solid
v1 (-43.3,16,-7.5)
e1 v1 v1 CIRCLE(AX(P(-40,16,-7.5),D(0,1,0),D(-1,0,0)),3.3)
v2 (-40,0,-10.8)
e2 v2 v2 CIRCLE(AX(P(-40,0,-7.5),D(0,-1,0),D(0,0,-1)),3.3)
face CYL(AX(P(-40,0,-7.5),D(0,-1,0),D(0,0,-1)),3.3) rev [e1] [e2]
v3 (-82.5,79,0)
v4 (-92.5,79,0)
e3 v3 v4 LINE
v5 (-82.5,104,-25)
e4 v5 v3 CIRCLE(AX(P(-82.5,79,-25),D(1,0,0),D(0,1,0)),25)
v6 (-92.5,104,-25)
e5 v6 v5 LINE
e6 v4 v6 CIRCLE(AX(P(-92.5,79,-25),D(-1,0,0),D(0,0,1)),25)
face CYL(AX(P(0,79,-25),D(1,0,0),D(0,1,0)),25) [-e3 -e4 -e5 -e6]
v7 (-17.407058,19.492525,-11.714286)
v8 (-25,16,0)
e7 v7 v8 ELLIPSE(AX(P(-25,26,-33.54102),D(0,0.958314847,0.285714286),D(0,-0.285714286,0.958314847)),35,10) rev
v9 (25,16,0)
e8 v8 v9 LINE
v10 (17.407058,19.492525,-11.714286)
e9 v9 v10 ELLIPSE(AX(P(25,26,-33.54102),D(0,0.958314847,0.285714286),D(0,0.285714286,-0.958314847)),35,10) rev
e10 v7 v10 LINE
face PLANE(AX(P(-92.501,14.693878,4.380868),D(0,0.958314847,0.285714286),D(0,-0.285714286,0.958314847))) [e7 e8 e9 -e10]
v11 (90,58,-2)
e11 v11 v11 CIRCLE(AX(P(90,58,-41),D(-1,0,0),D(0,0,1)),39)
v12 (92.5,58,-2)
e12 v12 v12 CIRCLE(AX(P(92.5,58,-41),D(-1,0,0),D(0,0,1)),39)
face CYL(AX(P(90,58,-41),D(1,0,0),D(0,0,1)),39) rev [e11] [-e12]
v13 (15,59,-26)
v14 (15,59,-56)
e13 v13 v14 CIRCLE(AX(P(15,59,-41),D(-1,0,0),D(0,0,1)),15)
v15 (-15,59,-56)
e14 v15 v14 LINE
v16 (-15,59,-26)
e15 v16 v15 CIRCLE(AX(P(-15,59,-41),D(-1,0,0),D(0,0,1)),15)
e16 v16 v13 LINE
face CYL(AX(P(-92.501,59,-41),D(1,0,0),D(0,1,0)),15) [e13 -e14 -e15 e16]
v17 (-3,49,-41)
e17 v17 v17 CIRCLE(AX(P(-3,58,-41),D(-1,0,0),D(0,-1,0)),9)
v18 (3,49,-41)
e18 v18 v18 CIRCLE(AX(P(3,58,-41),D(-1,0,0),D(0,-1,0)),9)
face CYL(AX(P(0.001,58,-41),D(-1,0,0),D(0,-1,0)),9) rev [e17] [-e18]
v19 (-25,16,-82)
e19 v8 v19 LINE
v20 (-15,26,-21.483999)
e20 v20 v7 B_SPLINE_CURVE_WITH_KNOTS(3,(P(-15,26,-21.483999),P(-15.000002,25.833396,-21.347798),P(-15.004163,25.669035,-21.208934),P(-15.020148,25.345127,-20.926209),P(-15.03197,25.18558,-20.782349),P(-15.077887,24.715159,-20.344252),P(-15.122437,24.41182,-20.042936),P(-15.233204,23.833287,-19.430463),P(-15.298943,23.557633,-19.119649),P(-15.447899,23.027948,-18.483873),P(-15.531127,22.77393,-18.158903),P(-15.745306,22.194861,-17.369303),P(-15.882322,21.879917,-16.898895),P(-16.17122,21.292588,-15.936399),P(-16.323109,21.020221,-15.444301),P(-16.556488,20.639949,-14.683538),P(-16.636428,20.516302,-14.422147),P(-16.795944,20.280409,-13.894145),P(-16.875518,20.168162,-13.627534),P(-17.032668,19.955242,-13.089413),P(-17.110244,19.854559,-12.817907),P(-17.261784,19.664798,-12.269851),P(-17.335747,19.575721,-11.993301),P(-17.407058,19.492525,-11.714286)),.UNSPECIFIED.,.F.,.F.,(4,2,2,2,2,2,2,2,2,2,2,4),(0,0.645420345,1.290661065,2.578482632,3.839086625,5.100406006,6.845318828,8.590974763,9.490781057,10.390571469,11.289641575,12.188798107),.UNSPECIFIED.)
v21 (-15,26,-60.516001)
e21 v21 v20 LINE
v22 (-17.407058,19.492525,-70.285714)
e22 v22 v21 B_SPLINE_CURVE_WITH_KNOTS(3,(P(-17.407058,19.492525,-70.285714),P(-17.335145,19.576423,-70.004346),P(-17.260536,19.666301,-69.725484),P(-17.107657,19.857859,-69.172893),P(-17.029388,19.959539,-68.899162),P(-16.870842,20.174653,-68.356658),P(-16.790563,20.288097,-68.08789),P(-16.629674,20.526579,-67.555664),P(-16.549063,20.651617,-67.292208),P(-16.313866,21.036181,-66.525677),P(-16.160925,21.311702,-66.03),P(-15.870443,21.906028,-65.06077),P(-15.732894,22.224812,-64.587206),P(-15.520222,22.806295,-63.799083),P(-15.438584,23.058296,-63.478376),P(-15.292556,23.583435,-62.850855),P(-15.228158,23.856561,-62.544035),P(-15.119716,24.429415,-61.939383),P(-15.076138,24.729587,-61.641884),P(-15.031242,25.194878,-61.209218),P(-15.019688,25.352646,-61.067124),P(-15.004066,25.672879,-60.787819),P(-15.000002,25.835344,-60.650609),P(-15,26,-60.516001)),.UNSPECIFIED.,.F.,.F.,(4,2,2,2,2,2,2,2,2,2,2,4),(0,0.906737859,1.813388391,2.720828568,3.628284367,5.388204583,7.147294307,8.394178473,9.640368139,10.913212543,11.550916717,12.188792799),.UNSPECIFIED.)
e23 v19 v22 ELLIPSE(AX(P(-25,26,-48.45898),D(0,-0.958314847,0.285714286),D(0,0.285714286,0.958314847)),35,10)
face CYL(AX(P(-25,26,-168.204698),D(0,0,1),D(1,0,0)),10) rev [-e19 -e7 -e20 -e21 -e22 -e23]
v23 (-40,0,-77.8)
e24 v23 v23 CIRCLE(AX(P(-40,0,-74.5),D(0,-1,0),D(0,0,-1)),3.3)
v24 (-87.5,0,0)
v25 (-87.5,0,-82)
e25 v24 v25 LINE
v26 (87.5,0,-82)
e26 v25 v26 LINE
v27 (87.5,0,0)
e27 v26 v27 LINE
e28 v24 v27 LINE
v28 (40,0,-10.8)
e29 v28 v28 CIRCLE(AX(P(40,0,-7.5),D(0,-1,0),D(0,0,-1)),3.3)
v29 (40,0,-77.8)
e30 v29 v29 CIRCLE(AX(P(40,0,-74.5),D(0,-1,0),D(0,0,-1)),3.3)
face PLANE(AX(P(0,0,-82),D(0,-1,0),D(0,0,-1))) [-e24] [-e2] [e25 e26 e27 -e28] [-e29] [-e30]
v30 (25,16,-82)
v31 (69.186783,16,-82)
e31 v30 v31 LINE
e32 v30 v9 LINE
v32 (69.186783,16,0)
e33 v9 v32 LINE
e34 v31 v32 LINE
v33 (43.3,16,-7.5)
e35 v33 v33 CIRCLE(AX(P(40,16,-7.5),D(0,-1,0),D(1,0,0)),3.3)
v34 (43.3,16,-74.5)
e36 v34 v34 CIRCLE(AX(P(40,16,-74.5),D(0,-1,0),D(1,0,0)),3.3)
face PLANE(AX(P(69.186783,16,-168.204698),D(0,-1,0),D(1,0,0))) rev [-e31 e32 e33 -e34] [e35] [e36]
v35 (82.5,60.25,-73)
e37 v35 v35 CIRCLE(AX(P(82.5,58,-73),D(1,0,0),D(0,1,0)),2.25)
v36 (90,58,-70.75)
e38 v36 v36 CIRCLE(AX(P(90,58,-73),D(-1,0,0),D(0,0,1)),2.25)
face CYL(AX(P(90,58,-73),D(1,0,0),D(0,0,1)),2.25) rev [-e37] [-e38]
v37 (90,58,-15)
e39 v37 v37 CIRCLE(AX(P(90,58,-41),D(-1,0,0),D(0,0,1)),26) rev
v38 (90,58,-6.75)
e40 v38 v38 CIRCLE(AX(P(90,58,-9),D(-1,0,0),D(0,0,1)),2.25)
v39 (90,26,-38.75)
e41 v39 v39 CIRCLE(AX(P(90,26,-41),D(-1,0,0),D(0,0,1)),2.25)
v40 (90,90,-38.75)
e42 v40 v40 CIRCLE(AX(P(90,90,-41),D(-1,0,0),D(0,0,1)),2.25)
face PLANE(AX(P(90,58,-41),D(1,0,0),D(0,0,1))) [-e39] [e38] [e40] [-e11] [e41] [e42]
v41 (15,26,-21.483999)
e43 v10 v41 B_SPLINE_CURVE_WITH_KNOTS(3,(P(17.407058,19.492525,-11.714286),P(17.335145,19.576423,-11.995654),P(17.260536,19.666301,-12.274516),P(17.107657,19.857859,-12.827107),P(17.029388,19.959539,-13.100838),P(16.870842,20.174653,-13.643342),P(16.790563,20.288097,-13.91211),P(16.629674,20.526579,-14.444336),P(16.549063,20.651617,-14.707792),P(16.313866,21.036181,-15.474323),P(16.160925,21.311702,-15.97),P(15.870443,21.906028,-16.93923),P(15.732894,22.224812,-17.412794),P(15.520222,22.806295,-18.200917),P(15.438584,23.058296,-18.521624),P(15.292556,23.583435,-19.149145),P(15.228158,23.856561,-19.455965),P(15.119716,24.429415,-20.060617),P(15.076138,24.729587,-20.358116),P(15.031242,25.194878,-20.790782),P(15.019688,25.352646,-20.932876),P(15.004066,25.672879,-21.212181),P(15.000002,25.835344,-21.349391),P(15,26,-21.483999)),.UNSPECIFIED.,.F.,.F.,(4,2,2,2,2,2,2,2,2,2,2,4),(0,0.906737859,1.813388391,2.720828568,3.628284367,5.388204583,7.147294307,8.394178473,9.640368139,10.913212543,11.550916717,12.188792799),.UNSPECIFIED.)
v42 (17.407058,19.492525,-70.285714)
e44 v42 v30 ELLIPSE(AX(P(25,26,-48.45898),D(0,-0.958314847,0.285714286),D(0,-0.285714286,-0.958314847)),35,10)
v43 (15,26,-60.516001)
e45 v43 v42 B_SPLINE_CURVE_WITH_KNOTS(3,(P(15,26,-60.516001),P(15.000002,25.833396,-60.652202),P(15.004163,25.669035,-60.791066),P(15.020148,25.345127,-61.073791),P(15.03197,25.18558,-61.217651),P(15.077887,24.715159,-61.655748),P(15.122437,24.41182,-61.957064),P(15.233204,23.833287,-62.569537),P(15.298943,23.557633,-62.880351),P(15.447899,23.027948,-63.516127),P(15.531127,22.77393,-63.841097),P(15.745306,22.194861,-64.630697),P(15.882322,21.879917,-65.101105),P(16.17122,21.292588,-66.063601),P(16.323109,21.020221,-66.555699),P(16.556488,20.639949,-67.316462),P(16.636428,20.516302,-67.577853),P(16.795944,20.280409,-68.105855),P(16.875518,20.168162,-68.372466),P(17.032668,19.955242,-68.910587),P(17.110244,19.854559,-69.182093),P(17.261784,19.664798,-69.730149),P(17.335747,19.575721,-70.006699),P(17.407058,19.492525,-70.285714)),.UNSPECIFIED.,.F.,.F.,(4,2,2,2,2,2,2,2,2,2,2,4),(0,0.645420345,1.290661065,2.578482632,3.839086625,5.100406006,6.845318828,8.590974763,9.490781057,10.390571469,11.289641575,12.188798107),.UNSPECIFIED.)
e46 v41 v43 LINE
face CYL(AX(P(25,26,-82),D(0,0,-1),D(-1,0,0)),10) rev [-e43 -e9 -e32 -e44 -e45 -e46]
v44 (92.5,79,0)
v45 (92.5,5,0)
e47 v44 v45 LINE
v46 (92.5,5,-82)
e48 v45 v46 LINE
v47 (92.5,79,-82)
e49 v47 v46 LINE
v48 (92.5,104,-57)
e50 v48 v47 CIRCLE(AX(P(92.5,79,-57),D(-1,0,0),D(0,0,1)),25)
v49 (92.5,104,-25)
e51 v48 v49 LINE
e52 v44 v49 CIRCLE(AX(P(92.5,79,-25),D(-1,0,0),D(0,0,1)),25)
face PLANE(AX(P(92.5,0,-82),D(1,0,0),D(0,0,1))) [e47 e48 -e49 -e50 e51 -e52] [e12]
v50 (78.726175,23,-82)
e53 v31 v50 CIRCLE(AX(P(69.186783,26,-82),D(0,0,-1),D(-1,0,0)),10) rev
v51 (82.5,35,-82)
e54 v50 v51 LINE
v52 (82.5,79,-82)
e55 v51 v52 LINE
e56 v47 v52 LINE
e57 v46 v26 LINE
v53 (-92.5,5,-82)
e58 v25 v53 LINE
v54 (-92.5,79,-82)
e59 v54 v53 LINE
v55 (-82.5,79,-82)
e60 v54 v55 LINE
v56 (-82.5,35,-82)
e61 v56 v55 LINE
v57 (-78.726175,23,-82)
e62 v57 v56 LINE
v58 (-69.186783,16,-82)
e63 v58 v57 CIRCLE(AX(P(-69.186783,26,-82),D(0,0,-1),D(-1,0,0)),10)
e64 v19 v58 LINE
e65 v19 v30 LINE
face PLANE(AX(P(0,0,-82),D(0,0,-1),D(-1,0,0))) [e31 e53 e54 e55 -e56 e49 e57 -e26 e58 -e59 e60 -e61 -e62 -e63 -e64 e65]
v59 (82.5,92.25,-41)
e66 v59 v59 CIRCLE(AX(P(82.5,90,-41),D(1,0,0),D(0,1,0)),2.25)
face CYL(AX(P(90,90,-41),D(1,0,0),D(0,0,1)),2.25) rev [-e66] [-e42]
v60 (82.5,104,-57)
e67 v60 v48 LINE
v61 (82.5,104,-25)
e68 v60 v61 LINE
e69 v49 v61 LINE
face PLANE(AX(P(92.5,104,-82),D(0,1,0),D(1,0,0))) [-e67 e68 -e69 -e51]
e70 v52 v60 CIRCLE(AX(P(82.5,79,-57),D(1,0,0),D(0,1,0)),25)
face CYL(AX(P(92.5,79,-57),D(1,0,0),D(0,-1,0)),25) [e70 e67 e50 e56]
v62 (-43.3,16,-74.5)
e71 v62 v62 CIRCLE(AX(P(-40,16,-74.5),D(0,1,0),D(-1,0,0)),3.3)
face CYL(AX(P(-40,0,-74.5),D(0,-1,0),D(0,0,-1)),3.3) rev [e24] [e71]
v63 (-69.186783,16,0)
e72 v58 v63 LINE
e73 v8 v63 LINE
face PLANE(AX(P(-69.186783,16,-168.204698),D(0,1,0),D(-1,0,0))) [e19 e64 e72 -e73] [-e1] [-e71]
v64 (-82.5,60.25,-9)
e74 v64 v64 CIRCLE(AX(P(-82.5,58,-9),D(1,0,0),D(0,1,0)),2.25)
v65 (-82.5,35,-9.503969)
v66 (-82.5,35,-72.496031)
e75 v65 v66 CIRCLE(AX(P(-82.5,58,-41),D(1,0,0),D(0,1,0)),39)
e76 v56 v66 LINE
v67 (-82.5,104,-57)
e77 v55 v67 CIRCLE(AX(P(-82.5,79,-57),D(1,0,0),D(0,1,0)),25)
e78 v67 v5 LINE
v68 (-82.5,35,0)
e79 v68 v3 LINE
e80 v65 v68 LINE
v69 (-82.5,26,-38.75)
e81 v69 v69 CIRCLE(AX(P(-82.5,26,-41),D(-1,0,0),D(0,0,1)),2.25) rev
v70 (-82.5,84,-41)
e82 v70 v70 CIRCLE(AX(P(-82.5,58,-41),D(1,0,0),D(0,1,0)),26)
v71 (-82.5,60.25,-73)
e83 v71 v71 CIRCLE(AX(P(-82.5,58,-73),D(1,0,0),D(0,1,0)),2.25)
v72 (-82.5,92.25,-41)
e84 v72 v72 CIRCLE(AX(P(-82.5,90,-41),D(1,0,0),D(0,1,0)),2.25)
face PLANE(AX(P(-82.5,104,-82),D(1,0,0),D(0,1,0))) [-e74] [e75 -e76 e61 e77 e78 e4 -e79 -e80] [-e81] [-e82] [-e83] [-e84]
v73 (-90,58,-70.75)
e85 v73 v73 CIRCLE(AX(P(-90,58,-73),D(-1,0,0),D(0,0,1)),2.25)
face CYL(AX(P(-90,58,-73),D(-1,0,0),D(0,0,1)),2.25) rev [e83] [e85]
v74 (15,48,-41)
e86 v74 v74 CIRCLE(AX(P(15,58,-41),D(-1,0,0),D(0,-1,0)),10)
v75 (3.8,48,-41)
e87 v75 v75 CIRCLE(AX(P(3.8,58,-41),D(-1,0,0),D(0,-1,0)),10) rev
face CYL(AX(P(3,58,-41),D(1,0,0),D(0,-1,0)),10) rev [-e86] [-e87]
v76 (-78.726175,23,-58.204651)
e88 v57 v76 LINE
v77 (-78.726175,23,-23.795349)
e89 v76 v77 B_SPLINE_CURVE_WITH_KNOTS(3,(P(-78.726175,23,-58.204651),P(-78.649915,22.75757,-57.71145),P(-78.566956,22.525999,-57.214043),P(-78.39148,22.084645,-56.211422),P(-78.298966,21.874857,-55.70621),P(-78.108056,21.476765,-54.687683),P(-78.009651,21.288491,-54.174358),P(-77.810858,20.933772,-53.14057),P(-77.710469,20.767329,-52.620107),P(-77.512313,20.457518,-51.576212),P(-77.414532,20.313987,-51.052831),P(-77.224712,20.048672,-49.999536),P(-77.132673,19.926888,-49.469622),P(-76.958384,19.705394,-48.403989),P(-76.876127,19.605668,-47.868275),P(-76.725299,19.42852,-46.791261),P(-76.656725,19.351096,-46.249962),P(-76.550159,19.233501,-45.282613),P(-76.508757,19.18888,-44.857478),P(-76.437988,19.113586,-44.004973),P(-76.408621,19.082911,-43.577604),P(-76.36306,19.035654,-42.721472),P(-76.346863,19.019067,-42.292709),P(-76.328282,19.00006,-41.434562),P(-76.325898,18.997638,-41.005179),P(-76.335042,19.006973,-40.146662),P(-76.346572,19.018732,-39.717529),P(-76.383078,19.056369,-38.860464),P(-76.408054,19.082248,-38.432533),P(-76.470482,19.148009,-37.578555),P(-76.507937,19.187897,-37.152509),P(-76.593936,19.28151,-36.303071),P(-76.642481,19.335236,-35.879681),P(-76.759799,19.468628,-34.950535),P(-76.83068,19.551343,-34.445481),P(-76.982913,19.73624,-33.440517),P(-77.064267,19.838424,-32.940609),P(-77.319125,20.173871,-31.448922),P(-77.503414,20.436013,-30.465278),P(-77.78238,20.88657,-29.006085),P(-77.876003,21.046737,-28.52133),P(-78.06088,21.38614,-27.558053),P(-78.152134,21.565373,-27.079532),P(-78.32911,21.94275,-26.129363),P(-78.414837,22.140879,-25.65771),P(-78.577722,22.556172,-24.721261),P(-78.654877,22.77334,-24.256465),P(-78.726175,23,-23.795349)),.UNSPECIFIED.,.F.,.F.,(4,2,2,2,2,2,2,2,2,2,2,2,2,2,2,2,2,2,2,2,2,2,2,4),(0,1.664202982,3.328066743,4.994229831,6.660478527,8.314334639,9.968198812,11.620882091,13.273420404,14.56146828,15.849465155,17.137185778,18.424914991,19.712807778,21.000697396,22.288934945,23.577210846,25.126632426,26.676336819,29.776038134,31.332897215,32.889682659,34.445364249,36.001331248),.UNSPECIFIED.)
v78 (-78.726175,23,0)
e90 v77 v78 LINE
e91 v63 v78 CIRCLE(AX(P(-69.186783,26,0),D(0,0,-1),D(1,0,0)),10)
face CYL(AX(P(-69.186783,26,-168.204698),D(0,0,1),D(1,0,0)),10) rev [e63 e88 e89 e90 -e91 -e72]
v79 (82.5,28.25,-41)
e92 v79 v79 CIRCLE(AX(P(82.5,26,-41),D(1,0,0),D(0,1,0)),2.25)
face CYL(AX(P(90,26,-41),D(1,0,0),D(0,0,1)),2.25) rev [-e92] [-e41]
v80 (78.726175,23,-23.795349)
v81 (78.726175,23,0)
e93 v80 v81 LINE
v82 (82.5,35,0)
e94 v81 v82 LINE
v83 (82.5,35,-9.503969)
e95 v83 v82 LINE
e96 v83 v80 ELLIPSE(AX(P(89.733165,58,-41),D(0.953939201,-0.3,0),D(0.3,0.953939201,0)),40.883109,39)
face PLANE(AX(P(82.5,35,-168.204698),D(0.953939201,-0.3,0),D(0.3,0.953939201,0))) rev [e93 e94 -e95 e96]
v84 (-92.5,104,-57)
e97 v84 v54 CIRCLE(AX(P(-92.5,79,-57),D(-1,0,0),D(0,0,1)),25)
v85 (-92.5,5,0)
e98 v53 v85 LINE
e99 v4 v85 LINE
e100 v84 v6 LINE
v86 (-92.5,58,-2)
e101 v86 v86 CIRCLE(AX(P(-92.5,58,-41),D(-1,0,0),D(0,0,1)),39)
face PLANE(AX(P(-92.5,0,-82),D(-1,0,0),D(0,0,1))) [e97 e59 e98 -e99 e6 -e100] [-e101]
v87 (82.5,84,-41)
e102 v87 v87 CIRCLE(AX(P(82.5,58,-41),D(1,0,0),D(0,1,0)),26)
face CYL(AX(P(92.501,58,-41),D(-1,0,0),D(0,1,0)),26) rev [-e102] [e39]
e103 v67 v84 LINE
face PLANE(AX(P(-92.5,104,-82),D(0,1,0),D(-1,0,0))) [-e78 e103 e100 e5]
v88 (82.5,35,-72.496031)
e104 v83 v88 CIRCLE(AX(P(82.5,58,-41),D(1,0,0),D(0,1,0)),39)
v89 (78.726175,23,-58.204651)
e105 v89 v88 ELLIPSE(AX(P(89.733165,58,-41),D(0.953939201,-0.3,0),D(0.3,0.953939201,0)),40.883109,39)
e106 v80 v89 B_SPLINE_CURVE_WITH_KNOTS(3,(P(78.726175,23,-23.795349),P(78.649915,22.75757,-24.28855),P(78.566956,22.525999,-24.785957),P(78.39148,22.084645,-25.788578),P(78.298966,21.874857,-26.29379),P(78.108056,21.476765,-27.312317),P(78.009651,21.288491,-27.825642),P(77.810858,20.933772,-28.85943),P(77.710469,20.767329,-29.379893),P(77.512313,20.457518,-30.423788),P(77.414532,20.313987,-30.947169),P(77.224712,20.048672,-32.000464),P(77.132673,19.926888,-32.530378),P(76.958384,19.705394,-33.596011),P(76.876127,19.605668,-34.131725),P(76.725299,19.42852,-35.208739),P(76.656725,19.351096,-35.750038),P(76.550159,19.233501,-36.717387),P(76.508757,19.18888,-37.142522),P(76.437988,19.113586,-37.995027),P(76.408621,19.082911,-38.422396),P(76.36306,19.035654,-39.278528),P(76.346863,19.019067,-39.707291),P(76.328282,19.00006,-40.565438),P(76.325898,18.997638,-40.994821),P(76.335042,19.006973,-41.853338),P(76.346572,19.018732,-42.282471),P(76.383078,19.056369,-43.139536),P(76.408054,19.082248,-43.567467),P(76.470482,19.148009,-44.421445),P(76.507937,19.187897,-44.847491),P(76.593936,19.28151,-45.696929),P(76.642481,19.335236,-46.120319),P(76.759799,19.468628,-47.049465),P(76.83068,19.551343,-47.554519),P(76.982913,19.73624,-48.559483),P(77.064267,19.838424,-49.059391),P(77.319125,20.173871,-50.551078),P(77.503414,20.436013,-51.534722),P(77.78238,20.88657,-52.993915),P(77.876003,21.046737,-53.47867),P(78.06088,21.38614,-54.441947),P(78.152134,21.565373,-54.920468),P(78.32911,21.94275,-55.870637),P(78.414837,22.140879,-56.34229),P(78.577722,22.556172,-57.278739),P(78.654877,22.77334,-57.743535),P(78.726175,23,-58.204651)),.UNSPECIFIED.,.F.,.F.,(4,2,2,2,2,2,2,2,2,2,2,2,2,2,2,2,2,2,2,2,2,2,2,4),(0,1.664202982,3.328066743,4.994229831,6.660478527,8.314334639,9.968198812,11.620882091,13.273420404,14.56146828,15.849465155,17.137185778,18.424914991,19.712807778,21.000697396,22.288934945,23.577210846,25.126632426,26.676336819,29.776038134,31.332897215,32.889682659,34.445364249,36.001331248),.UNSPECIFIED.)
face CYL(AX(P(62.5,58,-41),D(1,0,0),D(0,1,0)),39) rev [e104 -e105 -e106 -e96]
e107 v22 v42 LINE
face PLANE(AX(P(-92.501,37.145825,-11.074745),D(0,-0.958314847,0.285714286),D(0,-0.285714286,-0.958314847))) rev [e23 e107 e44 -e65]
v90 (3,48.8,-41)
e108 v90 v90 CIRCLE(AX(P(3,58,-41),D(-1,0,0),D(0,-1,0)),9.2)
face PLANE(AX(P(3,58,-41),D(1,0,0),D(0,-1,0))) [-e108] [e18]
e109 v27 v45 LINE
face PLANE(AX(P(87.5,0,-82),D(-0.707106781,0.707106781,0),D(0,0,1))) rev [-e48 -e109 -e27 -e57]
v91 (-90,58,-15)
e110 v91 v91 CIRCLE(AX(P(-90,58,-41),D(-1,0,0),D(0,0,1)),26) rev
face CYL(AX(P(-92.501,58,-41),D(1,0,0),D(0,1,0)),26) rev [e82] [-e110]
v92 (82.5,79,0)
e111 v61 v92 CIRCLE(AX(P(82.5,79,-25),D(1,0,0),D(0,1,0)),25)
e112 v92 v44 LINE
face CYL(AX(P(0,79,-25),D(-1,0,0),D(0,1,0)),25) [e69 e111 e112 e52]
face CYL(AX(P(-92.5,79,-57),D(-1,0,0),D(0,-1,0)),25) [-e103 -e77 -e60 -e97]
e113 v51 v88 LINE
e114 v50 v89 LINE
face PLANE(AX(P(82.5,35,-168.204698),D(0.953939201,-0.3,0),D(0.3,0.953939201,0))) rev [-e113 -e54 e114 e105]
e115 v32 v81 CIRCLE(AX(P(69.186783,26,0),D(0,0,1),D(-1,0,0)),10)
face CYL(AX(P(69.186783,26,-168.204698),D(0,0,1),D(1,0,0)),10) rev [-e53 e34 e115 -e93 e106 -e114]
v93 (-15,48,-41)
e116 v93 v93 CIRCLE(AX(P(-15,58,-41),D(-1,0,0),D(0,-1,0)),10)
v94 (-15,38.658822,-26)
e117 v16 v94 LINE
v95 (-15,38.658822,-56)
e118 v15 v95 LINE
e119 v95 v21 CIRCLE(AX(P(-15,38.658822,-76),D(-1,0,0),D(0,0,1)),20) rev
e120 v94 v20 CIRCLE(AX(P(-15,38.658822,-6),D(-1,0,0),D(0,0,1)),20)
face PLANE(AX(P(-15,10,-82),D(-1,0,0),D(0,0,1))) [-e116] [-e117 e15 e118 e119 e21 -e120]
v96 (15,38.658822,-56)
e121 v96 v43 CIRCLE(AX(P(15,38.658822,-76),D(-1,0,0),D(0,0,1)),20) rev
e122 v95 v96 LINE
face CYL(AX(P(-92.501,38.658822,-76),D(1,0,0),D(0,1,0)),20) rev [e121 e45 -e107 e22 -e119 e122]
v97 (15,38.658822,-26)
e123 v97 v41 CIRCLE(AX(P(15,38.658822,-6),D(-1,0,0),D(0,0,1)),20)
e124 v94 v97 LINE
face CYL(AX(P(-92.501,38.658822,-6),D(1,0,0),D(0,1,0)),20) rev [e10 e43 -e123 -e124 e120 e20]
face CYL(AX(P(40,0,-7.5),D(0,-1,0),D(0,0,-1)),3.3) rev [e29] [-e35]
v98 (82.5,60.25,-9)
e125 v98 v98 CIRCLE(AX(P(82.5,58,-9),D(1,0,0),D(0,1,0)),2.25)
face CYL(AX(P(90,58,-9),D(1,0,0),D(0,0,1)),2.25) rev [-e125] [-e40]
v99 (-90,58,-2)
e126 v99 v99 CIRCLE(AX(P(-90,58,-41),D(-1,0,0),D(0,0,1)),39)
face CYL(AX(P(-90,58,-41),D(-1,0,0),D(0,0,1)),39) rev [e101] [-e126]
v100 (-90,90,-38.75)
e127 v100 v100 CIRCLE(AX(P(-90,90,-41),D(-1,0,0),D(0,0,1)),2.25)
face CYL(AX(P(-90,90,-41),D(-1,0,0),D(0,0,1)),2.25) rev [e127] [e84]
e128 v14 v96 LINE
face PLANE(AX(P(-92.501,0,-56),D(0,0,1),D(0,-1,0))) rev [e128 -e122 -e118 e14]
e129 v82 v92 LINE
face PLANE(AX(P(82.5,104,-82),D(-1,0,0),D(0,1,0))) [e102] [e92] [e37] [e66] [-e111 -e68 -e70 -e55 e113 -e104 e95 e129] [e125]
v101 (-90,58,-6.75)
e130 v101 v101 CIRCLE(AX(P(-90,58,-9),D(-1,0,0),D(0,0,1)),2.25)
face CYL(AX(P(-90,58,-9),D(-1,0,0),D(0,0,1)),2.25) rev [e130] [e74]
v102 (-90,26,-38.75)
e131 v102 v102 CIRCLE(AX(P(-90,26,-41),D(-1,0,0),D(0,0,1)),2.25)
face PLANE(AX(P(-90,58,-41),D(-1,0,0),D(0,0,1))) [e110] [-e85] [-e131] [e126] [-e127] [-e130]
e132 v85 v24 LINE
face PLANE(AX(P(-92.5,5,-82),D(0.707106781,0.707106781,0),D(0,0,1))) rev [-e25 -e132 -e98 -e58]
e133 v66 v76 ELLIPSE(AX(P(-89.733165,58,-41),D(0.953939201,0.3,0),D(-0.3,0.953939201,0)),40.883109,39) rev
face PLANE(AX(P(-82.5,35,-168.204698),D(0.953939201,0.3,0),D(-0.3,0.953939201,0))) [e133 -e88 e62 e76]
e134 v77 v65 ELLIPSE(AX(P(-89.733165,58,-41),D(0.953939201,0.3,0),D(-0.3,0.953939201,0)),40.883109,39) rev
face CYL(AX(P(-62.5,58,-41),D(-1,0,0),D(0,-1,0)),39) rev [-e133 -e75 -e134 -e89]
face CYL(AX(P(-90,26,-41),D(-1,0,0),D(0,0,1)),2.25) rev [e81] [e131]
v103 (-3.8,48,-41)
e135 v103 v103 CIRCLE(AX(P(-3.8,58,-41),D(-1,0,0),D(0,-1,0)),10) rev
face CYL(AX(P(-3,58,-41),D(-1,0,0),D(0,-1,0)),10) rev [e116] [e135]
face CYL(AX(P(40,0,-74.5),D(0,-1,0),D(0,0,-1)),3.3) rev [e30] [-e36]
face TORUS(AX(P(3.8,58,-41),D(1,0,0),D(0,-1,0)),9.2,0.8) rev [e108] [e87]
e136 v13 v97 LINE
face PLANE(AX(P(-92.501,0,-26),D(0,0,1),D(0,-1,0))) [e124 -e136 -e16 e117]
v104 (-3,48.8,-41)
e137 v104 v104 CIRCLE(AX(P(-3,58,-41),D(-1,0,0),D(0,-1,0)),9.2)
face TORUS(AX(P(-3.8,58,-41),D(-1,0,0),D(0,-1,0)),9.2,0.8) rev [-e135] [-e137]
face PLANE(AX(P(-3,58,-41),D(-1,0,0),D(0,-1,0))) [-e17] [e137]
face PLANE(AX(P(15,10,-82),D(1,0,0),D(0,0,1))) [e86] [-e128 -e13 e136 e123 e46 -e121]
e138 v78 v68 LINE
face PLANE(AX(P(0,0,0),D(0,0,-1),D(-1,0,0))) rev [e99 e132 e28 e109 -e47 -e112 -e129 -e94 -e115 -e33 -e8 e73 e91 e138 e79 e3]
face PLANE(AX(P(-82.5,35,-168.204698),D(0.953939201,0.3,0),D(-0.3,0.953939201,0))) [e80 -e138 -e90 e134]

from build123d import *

# Parameters (mm, degrees)
BOSS_EXTRUDE1_DEPTH      = 82
SKETCH5_R                = 10
CUT_EXTRUDE1_DEPTH       = 12
CUT_EXTRUDE2_REACH       = 161.844
SKETCH6_R                = 9
CUT_EXTRUDE4_REACH       = 158.033
SKETCH8_R                = 26
CUT_EXTRUDE5_REACH       = 163.543
FILLET3_R                = 25
SKETCH13_R               = 39
CUT_EXTRUDE6_DEPTH       = 2.5
M4_CLEARANCE_HOLE1_D     = 4.5
M4_CLEARANCE_HOLE1_DEPTH = 7.5
FILLET5_R                = 0.8
CHAMFER1_SIZE            = 5
CHAMFER2_SIZE            = 5
BOSS_EXTRUDE3_START      = -82
BOSS_EXTRUDE3_DEPTH      = 82
SKETCH19_R               = 39
CUT_EXTRUDE7_DEPTH       = 20
M6_CLEARANCE_HOLE1_D     = 6.6
FILLET6_START            = -82.0000001
FILLET6_DEPTH            = 82.0000001
FILLET6_START_2          = -26
FILLET6_2_DEPTH          = 52


with BuildPart() as part:
    # Sketch1 → Boss-Extrude1 (new body)
    with BuildSketch(Plane.XY):
        Polygon((0, 0), (-82.5, 0), (-92.5, 0), (-92.5, 104), (-82.5, 104), (-82.5, 10), (-15, 10), (-15, 74), (0, 74), align=None)
    extrude(amount=-BOSS_EXTRUDE1_DEPTH)

    # Sketch5 → Cut-Extrude1 (cut)
    with BuildSketch(Plane.ZY.offset(15)):
        with Locations(Location((-41, 58, 0), (0, 0, 270))):
            Circle(SKETCH5_R)
    extrude(amount=-CUT_EXTRUDE1_DEPTH, mode=Mode.SUBTRACT)

    # Sketch6 → Cut-Extrude2 (cut, up to next)
    with BuildSketch(Plane.ZY.offset(3), mode=Mode.PRIVATE) as cut_extrude2_sk1:
        with Locations(Location((-41, 58, 0), (0, 0, 270))):
            Circle(SKETCH6_R)
    cut_extrude2_tool1 = extrude(cut_extrude2_sk1.sketch, amount=-CUT_EXTRUDE2_REACH, mode=Mode.PRIVATE) & part.part
    add(cut_extrude2_tool1.solids().sort_by_distance((-3, 58, -41))[0], mode=Mode.SUBTRACT)

    # Sketch8 → Cut-Extrude4 (cut, up to next)
    with BuildSketch(Plane(origin=(-82.5, 0, 0), x_dir=(0, 0, -1), z_dir=(1, 0, 0)), mode=Mode.PRIVATE) as cut_extrude4_sk1:
        with Locations(Location((41, 58, 0), (0, 0, 90))):
            Circle(SKETCH8_R)
    cut_extrude4_tool1 = extrude(cut_extrude4_sk1.sketch, amount=-CUT_EXTRUDE4_REACH, mode=Mode.PRIVATE) & part.part
    add(cut_extrude4_tool1.solids().sort_by_distance((-82.5, 58, -41))[0], mode=Mode.SUBTRACT)

    # Sketch10 → Cut-Extrude5 (cut, up to next)
    with BuildSketch(Plane(origin=(0, 0, 0), x_dir=(0, 0, -1), z_dir=(1, 0, 0)), mode=Mode.PRIVATE) as cut_extrude5_sk1:
        with BuildLine():
            Line((0, 74), (0, 16))
            Line((0, 16), (11.714285714, 19.492525222))
            ThreePointArc((11.714285714, 19.492525222), (22.035674515, 26.706536079), (26, 38.658822172))
            Line((26, 38.658822172), (26, 59))
            ThreePointArc((26, 59), (30.393398282, 69.606601718), (41, 74))
            Line((41, 74), (0, 74))
        make_face()
    cut_extrude5_tool1 = extrude(cut_extrude5_sk1.sketch, amount=-CUT_EXTRUDE5_REACH, mode=Mode.PRIVATE) & part.part
    # Sketch10 → Cut-Extrude5 (cut, up to next)
    with BuildSketch(Plane(origin=(0, 0, 0), x_dir=(0, 0, -1), z_dir=(1, 0, 0)), mode=Mode.PRIVATE) as cut_extrude5_sk2:
        with BuildLine():
            Line((82, 74), (41, 74))
            ThreePointArc((41, 74), (51.606601718, 69.606601718), (56, 59))
            Line((56, 59), (56, 38.658822172))
            ThreePointArc((56, 38.658822172), (59.964325485, 26.706536079), (70.285714286, 19.492525222))
            Line((70.285714286, 19.492525222), (82, 16))
            Line((82, 16), (82, 74))
        make_face()
    cut_extrude5_tool2 = extrude(cut_extrude5_sk2.sketch, amount=-CUT_EXTRUDE5_REACH, mode=Mode.PRIVATE) & part.part
    add(cut_extrude5_tool1.solids().sort_by_distance((0, 48.321716, -12.955067))[0], mode=Mode.SUBTRACT)
    add(cut_extrude5_tool2.solids().sort_by_distance((0, 48.321716, -69.044933))[0], mode=Mode.SUBTRACT)

    # Fillet3
    fillet3_edges = [part.edges().sort_by_distance(p)[0] for p in [
        (-87.5, 104, 0),
        (-87.5, 104, -82),
    ]]
    fillet(fillet3_edges, radius=FILLET3_R)

    # Sketch13 → Cut-Extrude6 (cut)
    with BuildSketch(Plane.ZY.offset(92.5)):
        with Locations((-41, 58)):
            Circle(SKETCH13_R)
    extrude(amount=-CUT_EXTRUDE6_DEPTH, mode=Mode.SUBTRACT)

    # M4 Clearance Hole1
    with Locations(Plane.ZY.offset(90)):
        with Locations((-41, 90), (-9, 58), (-41, 26), (-73, 58)):
            Hole(M4_CLEARANCE_HOLE1_D / 2, depth=M4_CLEARANCE_HOLE1_DEPTH)

    # Fillet5
    fillet5_edges = [part.edges().sort_by_distance(p)[0] for p in [
        (-3, 68, -41),
    ]]
    fillet(fillet5_edges, radius=FILLET5_R)

    # Mirror1: part across plane


with BuildPart() as part_1:
    add(part.part)
    add(part.part.mirror(Plane(origin=(0, 74, -82), x_dir=(0, 0, 1), z_dir=(1, 0, 0))))

    # Chamfer1
    chamfer1_edges = [part_1.edges().sort_by_distance(p)[0] for p in [
        (92.5, 0, -41),
        (-92.5, 0, -41),
    ]]
    chamfer(chamfer1_edges, length=CHAMFER1_SIZE)

    # Chamfer2
    chamfer2_edges = [part_1.edges().sort_by_distance(p)[0] for p in [
        (82.5, 10, -41),
        (-82.5, 10, -41),
    ]]
    chamfer(chamfer2_edges, length=CHAMFER2_SIZE)

    # Sketch18 → Boss-Extrude3 (add)
    with BuildSketch(Plane.XY.offset(BOSS_EXTRUDE3_START)):
        with BuildLine():
            Line((-82.5, 35), (-78.726174588, 23))
            ThreePointArc((-78.726174588, 23), (-75.102862357, 17.937742252), (-69.186782574, 16))
            Line((-69.186782574, 16), (0, 16))
            Line((0, 16), (0, 10))
            Line((0, 10), (-77.5, 10))
            Line((-77.5, 10), (-82.5, 15))
            Line((-82.5, 15), (-82.5, 35))
        make_face()
    boss_extrude3 = extrude(amount=BOSS_EXTRUDE3_DEPTH)

    # Mirror2: Boss-Extrude3 across plane
    add(boss_extrude3.mirror(Plane(origin=(0, 0, 0), x_dir=(0, 0, 1), z_dir=(1, 0, 0))))

    # Sketch19 → Cut-Extrude7 (cut)
    with BuildSketch(Plane(origin=(-82.5, 0, 0), x_dir=(0, 0, -1), z_dir=(1, 0, 0))):
        with Locations(Location((41, 58, 0), (0, 0, 180))):
            Circle(SKETCH19_R)
    cut_extrude7 = extrude(amount=CUT_EXTRUDE7_DEPTH, mode=Mode.SUBTRACT)

    # Mirror3: Cut-Extrude7 across plane
    add(cut_extrude7.mirror(Plane(origin=(0, 0, 0), x_dir=(0, 0, 1), z_dir=(1, 0, 0))), mode=Mode.SUBTRACT)

    # M6 Clearance Hole1 (through all)
    with Locations(Plane(origin=(0, 0, 0), x_dir=(-1, 0, 0), z_dir=(0, -1, 0))):
        with Locations((-40, 74.5), (40, 74.5), (40, 7.5), (-40, 7.5)):
            Hole(M6_CLEARANCE_HOLE1_D / 2)

    # Fillet6: read off the stored shape, not the designer's step
    # Fillet6 outline → Fillet6 (add)
    with BuildSketch(Plane.XY.offset(FILLET6_START)):
        with BuildLine():
            Line((15, 16), (25, 16))
            ThreePointArc((25, 16), (17.928932188, 18.928932188), (15, 26))
            Line((15, 26), (15, 16))
        make_face()
        with BuildLine():
            ThreePointArc((-15, 26), (-17.928932188, 18.928932188), (-25, 16))
            Line((-25, 16), (-15, 16))
            Line((-15, 16), (-15, 26))
        make_face()
    extrude(amount=FILLET6_DEPTH)

    # Fillet6 2 outline → Fillet6 2 (cut)
    with BuildSketch(Plane.YZ.offset(FILLET6_START_2)):
        with BuildLine():
            Line((19.492525222, -70.285714286), (16, -82))
            Line((16, -82), (26, -82.0000001))
            Line((26, -82.0000001), (26, -60.516001123))
            ThreePointArc((26, -60.516001123), (22.013361061, -64.912681821), (19.492525222, -70.285714286))
        make_face()
        with BuildLine():
            Line((26, 0), (16, 0))
            Line((16, 0), (19.492525222, -11.714285714))
            ThreePointArc((19.492525222, -11.714285714), (22.013361061, -17.087318179), (26, -21.483998877))
            Line((26, -21.483998877), (26, 0))
        make_face()
    extrude(amount=FILLET6_2_DEPTH, mode=Mode.SUBTRACT)


solid = part_1.part
